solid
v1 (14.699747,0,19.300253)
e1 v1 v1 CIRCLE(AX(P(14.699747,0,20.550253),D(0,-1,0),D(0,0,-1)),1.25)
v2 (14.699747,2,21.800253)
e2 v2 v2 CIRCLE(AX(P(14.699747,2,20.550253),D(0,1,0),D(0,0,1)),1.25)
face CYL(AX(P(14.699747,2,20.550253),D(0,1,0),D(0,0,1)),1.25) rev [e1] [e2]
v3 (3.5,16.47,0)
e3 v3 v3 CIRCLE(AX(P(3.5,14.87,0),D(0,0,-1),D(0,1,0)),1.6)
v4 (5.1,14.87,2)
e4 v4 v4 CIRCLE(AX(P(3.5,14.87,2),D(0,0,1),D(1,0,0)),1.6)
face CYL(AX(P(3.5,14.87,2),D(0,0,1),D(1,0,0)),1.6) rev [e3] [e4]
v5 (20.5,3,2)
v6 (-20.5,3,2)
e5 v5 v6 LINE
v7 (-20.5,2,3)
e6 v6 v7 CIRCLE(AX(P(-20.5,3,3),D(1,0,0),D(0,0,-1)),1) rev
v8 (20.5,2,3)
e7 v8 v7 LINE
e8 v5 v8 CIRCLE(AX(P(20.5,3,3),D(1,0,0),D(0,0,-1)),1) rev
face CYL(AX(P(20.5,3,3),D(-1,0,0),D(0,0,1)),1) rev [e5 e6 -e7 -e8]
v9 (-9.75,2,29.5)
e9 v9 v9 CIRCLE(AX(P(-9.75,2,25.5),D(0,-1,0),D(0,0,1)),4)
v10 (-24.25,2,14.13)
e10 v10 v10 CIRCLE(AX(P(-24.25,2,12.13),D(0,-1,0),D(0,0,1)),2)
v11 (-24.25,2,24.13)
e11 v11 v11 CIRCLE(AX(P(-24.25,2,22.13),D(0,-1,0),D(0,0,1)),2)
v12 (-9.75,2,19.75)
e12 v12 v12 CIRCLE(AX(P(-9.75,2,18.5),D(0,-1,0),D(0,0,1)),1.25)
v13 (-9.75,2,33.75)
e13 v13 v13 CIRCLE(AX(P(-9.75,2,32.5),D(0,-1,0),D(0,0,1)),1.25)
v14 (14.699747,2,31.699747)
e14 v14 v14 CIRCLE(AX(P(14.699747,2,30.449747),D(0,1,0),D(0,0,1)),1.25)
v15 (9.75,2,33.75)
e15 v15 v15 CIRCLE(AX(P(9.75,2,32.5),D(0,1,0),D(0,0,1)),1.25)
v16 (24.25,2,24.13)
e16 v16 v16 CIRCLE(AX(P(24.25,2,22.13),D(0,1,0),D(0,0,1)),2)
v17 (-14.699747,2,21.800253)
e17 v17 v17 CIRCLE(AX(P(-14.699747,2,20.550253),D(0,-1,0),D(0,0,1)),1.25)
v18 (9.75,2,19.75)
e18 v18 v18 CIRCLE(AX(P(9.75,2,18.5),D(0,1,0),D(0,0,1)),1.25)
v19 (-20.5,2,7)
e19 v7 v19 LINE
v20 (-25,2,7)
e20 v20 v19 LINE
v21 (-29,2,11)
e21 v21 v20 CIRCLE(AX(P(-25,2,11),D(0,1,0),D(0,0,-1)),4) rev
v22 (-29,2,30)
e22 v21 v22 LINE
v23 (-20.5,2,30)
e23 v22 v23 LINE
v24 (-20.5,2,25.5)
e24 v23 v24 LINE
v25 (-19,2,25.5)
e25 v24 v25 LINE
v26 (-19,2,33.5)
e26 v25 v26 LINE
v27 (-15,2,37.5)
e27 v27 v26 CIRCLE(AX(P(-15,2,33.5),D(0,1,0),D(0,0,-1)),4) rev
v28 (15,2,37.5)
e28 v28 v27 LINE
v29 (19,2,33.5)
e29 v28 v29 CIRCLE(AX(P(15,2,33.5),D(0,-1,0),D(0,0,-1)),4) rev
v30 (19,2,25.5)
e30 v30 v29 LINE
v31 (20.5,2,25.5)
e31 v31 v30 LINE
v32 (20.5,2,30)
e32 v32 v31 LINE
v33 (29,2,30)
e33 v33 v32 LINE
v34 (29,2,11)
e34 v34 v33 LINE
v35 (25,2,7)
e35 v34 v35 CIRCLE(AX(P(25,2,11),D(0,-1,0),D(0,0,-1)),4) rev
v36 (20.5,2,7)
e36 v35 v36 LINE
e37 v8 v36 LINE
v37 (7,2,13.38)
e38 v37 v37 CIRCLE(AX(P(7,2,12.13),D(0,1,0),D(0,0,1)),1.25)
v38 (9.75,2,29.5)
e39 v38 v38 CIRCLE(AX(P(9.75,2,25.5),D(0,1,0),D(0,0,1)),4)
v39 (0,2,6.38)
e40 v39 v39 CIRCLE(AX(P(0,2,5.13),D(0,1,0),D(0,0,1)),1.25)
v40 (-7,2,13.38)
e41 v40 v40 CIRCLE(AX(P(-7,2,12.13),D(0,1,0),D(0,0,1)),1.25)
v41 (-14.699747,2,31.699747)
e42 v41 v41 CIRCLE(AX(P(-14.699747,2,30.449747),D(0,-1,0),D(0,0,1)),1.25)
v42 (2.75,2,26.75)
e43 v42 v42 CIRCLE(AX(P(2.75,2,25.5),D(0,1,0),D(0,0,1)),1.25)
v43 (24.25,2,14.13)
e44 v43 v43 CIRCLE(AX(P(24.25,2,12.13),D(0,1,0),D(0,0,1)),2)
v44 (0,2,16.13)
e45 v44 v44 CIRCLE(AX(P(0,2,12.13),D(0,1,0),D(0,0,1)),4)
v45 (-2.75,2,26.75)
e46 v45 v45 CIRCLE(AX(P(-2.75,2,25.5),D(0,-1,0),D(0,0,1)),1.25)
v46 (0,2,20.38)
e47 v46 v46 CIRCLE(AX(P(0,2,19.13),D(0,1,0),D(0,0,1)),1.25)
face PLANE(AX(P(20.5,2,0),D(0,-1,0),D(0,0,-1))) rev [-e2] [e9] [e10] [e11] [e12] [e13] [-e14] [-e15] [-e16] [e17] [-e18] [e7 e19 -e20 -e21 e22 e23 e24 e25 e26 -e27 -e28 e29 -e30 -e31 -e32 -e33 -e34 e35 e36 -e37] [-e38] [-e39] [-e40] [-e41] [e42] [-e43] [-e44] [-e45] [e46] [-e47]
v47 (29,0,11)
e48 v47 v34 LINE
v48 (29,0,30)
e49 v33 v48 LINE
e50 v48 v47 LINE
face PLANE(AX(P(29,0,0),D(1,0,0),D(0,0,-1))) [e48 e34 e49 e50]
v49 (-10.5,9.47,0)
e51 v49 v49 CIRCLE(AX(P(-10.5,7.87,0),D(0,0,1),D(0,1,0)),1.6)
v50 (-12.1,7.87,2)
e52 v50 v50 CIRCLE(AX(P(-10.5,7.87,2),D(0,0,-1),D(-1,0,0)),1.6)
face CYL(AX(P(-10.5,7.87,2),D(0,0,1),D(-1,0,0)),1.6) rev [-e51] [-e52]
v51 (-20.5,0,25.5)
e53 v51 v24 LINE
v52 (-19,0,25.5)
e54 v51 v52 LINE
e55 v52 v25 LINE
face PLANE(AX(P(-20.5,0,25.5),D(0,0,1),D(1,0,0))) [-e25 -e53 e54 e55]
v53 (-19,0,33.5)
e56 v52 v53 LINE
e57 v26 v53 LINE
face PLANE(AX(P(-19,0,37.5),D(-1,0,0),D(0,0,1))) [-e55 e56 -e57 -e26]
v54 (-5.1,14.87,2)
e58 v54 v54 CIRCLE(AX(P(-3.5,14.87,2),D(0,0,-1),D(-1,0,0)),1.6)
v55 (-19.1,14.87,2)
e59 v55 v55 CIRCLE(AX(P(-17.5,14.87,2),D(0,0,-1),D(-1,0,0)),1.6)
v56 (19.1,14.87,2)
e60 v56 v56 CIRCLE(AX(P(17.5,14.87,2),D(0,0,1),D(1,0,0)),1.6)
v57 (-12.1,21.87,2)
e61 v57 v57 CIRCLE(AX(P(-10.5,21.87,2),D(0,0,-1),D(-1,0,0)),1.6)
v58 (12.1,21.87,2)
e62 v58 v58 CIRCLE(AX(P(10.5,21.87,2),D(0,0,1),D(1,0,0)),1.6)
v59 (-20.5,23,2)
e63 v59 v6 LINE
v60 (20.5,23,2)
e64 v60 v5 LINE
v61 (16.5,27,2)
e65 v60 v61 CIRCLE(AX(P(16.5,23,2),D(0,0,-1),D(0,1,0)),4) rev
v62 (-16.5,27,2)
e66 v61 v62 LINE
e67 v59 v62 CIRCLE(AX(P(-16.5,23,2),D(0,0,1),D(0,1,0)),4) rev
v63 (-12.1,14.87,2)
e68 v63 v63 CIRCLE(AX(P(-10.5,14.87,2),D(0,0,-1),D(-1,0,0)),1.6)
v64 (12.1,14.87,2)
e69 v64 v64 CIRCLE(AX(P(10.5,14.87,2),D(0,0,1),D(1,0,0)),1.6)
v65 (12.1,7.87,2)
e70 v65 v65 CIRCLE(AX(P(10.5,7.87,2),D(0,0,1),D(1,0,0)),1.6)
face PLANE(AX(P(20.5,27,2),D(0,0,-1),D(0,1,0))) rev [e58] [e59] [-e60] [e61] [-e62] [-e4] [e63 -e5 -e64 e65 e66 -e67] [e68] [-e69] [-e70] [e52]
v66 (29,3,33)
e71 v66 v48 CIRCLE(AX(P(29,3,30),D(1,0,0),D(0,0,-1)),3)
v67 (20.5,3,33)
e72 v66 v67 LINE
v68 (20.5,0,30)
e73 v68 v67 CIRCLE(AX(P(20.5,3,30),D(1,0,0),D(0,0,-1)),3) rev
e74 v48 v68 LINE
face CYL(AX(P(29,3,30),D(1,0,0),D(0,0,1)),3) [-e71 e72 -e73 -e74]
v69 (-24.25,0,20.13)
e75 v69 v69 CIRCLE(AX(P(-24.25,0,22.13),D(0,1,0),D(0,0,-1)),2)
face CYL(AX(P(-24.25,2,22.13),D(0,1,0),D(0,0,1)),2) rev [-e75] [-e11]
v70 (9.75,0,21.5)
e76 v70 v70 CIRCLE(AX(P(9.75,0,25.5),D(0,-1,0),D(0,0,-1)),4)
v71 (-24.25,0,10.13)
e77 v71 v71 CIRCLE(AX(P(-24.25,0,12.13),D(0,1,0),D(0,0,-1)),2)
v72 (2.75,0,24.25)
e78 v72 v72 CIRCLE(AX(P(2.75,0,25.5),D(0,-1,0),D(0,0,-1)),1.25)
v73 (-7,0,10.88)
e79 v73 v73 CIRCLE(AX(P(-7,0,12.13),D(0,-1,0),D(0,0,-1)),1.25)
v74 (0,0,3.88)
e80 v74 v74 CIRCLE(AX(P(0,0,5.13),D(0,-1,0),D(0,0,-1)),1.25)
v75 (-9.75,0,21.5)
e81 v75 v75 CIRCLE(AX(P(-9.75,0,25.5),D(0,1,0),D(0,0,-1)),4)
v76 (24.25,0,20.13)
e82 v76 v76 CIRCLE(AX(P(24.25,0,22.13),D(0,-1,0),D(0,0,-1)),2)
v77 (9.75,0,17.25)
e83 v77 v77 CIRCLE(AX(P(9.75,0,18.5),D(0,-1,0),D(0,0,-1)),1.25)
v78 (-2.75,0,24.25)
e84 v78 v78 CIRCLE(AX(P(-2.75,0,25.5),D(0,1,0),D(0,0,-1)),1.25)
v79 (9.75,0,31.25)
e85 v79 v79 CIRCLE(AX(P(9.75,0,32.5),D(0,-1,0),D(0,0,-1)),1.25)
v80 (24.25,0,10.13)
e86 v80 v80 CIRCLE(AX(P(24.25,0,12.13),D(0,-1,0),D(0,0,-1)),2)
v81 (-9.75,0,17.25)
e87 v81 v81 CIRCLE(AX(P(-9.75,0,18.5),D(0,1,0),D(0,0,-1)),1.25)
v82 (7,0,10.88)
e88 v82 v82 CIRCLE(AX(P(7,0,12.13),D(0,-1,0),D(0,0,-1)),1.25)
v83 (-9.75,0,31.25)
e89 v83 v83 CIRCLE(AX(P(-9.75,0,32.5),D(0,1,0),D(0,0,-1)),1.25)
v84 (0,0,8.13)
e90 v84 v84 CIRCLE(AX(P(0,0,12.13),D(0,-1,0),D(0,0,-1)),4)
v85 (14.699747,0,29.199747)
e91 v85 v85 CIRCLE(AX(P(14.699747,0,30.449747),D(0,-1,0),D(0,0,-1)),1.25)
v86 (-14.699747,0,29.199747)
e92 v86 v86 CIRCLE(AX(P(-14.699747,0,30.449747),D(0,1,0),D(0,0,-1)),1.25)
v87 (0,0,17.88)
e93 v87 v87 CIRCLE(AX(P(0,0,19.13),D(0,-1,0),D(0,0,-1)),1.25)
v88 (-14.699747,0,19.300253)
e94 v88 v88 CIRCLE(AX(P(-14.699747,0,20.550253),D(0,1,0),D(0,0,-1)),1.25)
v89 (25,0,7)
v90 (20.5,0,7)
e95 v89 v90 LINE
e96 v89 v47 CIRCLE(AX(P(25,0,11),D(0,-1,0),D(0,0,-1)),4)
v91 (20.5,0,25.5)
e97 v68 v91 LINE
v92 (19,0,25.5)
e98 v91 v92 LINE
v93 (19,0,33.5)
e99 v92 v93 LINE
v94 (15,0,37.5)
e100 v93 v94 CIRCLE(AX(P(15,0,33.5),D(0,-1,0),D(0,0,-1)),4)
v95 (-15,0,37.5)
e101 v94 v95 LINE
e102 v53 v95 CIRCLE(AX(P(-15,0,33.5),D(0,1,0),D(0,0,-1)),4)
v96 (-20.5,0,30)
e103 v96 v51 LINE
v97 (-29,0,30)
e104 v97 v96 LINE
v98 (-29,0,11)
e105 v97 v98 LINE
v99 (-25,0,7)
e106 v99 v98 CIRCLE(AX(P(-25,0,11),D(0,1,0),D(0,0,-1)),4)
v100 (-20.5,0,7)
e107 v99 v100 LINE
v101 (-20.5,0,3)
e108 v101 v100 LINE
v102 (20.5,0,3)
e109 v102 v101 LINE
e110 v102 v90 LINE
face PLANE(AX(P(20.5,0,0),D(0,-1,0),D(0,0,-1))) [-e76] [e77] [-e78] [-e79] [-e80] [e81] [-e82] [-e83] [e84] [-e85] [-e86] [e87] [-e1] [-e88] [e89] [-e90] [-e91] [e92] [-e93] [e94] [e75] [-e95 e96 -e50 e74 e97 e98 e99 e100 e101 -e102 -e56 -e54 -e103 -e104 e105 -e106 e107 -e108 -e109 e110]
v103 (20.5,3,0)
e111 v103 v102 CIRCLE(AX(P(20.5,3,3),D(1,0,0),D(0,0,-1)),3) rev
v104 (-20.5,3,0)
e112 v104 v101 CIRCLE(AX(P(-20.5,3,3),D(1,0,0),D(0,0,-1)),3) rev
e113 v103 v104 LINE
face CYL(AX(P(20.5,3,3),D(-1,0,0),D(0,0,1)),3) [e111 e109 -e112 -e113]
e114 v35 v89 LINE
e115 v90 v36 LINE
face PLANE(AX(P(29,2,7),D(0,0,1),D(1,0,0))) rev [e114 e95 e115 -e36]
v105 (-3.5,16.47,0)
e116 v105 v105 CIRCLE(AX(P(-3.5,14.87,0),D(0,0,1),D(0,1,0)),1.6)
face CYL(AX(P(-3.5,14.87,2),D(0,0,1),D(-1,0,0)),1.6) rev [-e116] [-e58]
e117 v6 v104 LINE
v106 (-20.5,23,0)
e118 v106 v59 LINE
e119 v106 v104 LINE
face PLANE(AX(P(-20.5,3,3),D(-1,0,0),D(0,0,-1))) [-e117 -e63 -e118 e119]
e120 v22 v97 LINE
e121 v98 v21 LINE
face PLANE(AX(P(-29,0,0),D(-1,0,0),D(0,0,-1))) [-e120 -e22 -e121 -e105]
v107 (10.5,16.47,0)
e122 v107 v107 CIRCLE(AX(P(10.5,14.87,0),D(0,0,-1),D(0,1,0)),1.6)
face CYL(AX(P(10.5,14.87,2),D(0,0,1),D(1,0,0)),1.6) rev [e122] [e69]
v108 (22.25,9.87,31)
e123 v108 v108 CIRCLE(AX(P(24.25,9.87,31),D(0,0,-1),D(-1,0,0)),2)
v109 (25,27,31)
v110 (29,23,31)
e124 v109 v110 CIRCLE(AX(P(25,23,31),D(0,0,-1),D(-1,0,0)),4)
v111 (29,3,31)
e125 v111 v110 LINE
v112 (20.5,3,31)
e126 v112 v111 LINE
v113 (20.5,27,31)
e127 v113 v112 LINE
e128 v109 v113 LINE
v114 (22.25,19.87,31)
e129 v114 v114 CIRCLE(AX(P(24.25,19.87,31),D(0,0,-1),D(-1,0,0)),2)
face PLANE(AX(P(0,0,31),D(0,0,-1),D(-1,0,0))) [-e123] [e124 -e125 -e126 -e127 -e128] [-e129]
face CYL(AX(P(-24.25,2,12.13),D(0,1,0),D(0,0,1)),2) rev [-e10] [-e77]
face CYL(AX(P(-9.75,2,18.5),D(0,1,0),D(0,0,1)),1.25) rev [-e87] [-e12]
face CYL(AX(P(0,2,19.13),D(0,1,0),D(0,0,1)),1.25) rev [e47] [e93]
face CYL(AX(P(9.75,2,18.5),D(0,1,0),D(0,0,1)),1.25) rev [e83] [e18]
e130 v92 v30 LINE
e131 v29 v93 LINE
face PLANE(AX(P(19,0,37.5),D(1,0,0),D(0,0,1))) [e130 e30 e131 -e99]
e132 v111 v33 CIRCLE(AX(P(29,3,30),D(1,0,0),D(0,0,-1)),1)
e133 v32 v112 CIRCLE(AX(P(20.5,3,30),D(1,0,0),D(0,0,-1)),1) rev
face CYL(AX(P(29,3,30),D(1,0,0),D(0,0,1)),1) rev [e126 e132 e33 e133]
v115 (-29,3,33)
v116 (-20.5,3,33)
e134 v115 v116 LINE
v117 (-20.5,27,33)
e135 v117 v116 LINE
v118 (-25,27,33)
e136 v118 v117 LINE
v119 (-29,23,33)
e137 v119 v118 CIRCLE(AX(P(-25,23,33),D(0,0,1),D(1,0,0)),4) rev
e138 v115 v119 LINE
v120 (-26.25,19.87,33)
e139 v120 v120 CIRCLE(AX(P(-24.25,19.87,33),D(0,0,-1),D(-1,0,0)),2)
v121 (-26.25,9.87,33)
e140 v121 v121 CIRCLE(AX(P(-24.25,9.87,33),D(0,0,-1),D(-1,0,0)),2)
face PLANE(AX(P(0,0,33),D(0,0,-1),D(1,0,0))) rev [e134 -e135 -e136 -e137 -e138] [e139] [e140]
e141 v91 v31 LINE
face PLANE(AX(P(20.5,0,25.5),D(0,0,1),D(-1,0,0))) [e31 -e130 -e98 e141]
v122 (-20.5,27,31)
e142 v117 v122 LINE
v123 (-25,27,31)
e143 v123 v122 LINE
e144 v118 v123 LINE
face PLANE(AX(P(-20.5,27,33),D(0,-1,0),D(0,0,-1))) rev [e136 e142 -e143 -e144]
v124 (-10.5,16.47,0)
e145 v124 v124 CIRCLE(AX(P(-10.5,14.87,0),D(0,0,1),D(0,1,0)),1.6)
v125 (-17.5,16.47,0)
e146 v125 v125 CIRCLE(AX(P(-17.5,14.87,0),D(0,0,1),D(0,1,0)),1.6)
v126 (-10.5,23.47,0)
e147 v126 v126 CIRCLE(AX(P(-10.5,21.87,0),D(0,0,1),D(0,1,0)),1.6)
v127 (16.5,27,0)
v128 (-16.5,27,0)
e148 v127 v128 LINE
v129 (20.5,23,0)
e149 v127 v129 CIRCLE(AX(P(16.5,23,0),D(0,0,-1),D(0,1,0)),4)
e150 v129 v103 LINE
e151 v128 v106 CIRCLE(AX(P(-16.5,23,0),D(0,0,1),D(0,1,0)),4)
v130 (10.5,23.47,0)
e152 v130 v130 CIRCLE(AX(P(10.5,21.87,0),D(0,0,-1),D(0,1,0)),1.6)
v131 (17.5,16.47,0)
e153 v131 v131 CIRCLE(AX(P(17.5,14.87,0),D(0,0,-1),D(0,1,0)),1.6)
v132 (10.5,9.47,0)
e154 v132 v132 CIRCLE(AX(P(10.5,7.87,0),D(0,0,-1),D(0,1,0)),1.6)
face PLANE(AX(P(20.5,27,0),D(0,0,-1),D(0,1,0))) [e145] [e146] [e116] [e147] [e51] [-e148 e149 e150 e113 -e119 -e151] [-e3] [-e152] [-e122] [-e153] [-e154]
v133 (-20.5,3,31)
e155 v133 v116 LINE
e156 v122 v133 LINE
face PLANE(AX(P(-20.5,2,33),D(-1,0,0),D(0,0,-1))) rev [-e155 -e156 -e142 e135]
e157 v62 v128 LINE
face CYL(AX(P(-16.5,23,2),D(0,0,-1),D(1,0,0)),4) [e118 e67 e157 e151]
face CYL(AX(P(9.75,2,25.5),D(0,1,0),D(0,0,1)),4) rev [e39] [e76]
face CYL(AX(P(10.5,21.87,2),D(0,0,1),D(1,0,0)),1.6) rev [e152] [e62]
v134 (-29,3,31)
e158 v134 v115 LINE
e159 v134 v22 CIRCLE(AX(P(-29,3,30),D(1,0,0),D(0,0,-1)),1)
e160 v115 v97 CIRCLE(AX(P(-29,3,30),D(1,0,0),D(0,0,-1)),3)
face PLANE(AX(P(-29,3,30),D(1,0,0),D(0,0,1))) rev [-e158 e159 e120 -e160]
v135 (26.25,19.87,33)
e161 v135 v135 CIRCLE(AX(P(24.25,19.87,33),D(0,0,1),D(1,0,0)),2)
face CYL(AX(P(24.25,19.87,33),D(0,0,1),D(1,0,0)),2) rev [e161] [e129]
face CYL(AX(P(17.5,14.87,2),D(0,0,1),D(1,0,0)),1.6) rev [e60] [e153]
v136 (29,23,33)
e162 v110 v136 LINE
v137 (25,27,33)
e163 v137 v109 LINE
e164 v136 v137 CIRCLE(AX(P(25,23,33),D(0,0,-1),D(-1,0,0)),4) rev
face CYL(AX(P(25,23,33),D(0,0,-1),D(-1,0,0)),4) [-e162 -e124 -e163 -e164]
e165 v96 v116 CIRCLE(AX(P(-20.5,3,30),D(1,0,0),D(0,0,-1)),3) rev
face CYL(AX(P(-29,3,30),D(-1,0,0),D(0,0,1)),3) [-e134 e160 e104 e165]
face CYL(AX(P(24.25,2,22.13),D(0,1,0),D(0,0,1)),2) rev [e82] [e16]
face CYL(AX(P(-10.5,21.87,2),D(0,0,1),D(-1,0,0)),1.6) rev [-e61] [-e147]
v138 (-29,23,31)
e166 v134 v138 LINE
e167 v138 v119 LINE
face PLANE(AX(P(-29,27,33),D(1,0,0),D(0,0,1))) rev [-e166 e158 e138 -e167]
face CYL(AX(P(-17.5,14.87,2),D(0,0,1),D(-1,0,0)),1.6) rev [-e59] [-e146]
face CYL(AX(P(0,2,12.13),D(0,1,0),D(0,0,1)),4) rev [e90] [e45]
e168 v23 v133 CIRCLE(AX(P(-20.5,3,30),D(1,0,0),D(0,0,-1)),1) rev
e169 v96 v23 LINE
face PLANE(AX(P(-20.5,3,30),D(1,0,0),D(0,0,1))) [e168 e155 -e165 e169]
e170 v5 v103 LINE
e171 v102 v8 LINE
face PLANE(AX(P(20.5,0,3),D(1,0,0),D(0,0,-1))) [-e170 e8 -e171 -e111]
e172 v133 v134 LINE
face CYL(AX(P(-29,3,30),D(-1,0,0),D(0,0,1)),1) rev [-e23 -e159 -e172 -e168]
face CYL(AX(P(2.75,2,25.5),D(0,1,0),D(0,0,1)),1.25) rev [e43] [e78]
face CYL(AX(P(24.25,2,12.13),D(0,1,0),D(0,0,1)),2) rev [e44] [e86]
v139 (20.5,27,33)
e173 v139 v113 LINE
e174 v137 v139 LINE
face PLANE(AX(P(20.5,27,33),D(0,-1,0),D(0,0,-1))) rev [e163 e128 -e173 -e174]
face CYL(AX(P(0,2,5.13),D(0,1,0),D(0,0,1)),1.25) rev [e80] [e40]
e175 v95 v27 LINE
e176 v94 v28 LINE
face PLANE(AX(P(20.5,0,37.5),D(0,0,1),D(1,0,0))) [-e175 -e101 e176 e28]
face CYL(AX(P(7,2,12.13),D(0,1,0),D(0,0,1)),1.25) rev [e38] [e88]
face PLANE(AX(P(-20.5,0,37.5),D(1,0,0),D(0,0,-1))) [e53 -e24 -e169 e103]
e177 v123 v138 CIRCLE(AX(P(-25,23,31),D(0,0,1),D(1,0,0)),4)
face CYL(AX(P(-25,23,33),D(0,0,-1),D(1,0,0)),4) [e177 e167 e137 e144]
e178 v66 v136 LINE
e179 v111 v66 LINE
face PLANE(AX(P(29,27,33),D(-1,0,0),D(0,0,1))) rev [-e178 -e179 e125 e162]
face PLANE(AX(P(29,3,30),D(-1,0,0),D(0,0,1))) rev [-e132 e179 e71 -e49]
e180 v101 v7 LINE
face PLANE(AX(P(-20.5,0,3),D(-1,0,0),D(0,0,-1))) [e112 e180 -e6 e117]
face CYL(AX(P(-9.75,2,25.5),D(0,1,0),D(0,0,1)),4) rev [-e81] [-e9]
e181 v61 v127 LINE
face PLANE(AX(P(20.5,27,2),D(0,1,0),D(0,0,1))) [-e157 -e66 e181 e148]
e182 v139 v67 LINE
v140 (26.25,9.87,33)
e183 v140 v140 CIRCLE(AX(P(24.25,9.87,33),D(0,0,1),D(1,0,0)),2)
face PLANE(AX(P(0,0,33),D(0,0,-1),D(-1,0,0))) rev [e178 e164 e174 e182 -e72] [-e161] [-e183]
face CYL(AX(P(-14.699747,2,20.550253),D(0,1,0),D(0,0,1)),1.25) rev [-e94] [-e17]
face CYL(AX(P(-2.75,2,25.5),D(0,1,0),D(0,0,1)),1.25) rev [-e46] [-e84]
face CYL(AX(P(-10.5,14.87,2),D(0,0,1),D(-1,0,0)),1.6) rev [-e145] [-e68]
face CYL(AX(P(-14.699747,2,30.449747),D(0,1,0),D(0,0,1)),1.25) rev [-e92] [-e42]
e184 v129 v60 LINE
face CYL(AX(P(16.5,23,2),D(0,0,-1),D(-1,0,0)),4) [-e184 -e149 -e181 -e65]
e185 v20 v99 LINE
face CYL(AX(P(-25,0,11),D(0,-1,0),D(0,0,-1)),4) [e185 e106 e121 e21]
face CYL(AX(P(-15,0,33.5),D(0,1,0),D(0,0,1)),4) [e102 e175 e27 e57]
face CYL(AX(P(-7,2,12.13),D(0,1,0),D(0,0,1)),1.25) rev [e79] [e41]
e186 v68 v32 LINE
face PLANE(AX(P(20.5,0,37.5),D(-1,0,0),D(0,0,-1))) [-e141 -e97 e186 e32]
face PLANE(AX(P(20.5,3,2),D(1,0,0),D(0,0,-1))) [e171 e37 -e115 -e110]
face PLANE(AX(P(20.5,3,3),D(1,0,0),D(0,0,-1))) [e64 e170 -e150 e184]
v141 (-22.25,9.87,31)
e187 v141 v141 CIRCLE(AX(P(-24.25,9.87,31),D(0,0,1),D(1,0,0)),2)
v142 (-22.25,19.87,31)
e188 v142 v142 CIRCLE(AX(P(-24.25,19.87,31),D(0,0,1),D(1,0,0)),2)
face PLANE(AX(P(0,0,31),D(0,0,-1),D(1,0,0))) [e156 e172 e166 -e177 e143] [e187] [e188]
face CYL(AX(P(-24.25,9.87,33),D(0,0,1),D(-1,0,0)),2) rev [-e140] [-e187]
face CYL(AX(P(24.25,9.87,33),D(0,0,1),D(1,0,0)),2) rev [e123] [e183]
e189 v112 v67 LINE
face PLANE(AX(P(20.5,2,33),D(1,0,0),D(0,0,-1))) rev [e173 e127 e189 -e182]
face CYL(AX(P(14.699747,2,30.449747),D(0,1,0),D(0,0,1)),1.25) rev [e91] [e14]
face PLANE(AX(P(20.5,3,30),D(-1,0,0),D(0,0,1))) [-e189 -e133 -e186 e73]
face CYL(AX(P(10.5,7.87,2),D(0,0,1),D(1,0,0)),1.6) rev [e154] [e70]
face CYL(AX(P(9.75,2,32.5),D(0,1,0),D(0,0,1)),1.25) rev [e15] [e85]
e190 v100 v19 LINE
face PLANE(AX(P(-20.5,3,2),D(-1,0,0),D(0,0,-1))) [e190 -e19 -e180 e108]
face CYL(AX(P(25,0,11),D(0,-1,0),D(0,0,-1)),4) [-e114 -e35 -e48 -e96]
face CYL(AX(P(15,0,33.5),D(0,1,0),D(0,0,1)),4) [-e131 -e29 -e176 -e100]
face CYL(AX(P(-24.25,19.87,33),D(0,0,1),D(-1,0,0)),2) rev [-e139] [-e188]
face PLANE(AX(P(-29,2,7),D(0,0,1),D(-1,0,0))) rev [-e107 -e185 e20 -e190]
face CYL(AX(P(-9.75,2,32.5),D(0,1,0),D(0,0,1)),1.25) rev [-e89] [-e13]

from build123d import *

# Parameters (mm, degrees)
T_LE_DE_BASE_PLI_E1_DEPTH             = 20.5
ESQUISSE8_W                           = 24
ESQUISSE8_H                           = 2
BOSS_EXTRU_1_DEPTH                    = 8.5
T_LE_PLI_E_SUR_AR_TE1_STRIP_W         = 10
T_LE_PLI_E_SUR_AR_TE1_STRIP_H         = 2
T_LE_PLI_E_SUR_AR_TE1_STRIP_CUT_DEPTH = 8.5
T_LE_PLI_E_SUR_AR_TE1_DEPTH           = 8.5
ESQUISSE12_W                          = 1.5
ESQUISSE12_H                          = 12
ENL_V_MAT_EXTRU_1_DEPTH               = 8.5
DIAM_TRE_DU_PER_AGE_4_0_4_1_D         = 4
DIAM_TRE_DU_PER_AGE_8_0_8_1_D         = 8
DIAM_TRE_DU_PER_AGE_2_5_2_5_1_D       = 2.5
R_P_TITION_CIRCULAIRE1_COUNT          = 8
DIAM_TRE_DU_PER_AGE_4_0_4_2_D         = 4
HOLE_WIZARD_3_2_3_2_1_D               = 3.2
CONG_1_R                              = 4
DIAM_TRE_DU_PER_AGE_8_0_8_2_D         = 8
DIAM_TRE_DU_PER_AGE_2_5_2_5_3_D       = 2.5
R_P_TITION_CIRCULAIRE2_COUNT          = 4


# Sheet-metal steps are written as plain solids
with BuildPart() as part:
    # Esquisse1 → Tôle de base pliée1 (new body)
    with BuildSketch(Plane(origin=(0, 0, 0), x_dir=(0, 0, -1), z_dir=(1, 0, 0))):
        with BuildLine():
            Line((0, 27), (0, 3))
            ThreePointArc((0, 3), (-0.878679656, 0.878679656), (-3, 0))
            Line((-3, 0), (-37.5, 0))
            Line((-37.5, 0), (-37.5, 2))
            Line((-37.5, 2), (-3, 2))
            ThreePointArc((-3, 2), (-2.292893219, 2.292893219), (-2, 3))
            Line((-2, 3), (-2, 27))
            Line((-2, 27), (0, 27))
        make_face()
    extrude(amount=T_LE_DE_BASE_PLI_E1_DEPTH)

    # Esquisse8 → Boss.-Extru.1 (add)
    with BuildSketch(Plane(origin=(20.5, 0, 0), x_dir=(0, 0, -1), z_dir=(1, 0, 0))):
        with Locations((-19, 1)):
            Rectangle(ESQUISSE8_W, ESQUISSE8_H)
    extrude(amount=BOSS_EXTRU_1_DEPTH)

    # Tôle pliée sur arête1 strip (across the edge) → Tôle pliée sur arête1 strip cut (cut)
    with BuildSketch(Plane(origin=(20.5, 2, 31), x_dir=(0, 0, -1), z_dir=(1, 0, 0))):
        with Locations((-4, -1)):
            Rectangle(T_LE_PLI_E_SUR_AR_TE1_STRIP_W, T_LE_PLI_E_SUR_AR_TE1_STRIP_H)
    extrude(amount=T_LE_PLI_E_SUR_AR_TE1_STRIP_CUT_DEPTH, mode=Mode.SUBTRACT)

    # Tôle pliée sur arête1 section (across the edge) → Tôle pliée sur arête1 (add)
    with BuildSketch(Plane(origin=(20.5, 2, 31), x_dir=(0, 0, -1), z_dir=(1, 0, 0))):
        with BuildLine():
            Line((-2, 1), (-2, 25))
            Line((-2, 25), (0, 25))
            Line((0, 25), (0, 1))
            ThreePointArc((0, 1), (0.292893219, 0.292893219), (1, 0))
            Line((1, 0), (1, -2))
            ThreePointArc((1, -2), (-1.121320344, -1.121320344), (-2, 1))
        make_face()
    extrude(amount=T_LE_PLI_E_SUR_AR_TE1_DEPTH)

    # Esquisse12 → Enlèv. mat.-Extru.1 (cut)
    with BuildSketch(Plane(origin=(0, 2, 0), x_dir=(1, 0, 0), z_dir=(0, 1, 0))):
        with Locations((19.75, -31.5)):
            Rectangle(ESQUISSE12_W, ESQUISSE12_H)
    extrude(amount=-ENL_V_MAT_EXTRU_1_DEPTH, mode=Mode.SUBTRACT)

    # Diamètre du perçage Ø4.0 (4)1 (through all)
    with Locations(Plane(origin=(0, 2, 0), x_dir=(1, 0, 0), z_dir=(0, 1, 0))):
        with Locations((24.25, -12.13), (24.25, -22.13)):
            Hole(DIAM_TRE_DU_PER_AGE_4_0_4_1_D / 2)

    # Diamètre du perçage Ø8.0 (8)1 (through all)
    with Locations(Plane(origin=(0, 2, 0), x_dir=(1, 0, 0), z_dir=(0, 1, 0))):
        with Locations((9.75, -25.5)):
            Hole(DIAM_TRE_DU_PER_AGE_8_0_8_1_D / 2)

    # Diamètre du perçage Ø2.5 (2.5)1 (through all)
    with Locations(Plane(origin=(0, 2, 0), x_dir=(1, 0, 0), z_dir=(0, 1, 0))):
        with Locations((9.75, -18.5)):
            diam_tre_du_per_age_2_5_2_5_1 = Hole(DIAM_TRE_DU_PER_AGE_2_5_2_5_1_D / 2)

    # Répétition circulaire1: Diamètre du perçage Ø2.5 (2.5)1 ×8 about axis, 3 skipped
    r_p_tition_circulaire1_axis = Axis((9.75, 2, 25.5), (0, 1, 0))
    add([diam_tre_du_per_age_2_5_2_5_1.rotate(r_p_tition_circulaire1_axis, i * 360 / R_P_TITION_CIRCULAIRE1_COUNT) for i in range(1, R_P_TITION_CIRCULAIRE1_COUNT) if i not in (1, 3, 6)], mode=Mode.SUBTRACT)

    # Diamètre du perçage Ø4.0 (4)2 (through all)
    with Locations(Plane.XY.offset(33)):
        with Locations((24.25, 19.87), (24.25, 9.87)):
            Hole(DIAM_TRE_DU_PER_AGE_4_0_4_2_D / 2)

    # Ø3.2 (3.2) 直径孔1 (through all)
    with Locations(Plane.XY.offset(2)):
        with Locations((10.5, 14.87), (10.5, 21.87), (17.5, 14.87), (10.5, 7.87), (3.5, 14.87)):
            Hole(HOLE_WIZARD_3_2_3_2_1_D / 2)

    # Congé1
    cong_1_edges = [part.edges().sort_by_distance(p)[0] for p in [
        (20.5, 27, 1),
        (29, 1, 7),
        (29, 27, 32),
        (19, 1, 37.5),
    ]]
    fillet(cong_1_edges, radius=CONG_1_R)

    # Symétrie1: part across plane


with BuildPart() as part_1:
    add(part.part)
    add(part.part.mirror(Plane(origin=(0, 3, 3), x_dir=(0, 0, 1), z_dir=(1, 0, 0))))

    # Diamètre du perçage Ø8.0 (8)2 (through all)
    with Locations(Plane(origin=(0, 2, 0), x_dir=(1, 0, 0), z_dir=(0, 1, 0))):
        with Locations((0, -12.13)):
            Hole(DIAM_TRE_DU_PER_AGE_8_0_8_2_D / 2)

    # Diamètre du perçage Ø2.5 (2.5)3 (through all)
    with Locations(Plane(origin=(0, 2, 0), x_dir=(1, 0, 0), z_dir=(0, 1, 0))):
        with Locations((0, -5.13)):
            diam_tre_du_per_age_2_5_2_5_3 = Hole(DIAM_TRE_DU_PER_AGE_2_5_2_5_3_D / 2)

    # Répétition circulaire2: Diamètre du perçage Ø2.5 (2.5)3 ×4 about axis
    r_p_tition_circulaire2_axis = Axis((0, 0, 12.13), (0, 1, 0))
    for i in range(1, R_P_TITION_CIRCULAIRE2_COUNT):
        add(diam_tre_du_per_age_2_5_2_5_3.rotate(r_p_tition_circulaire2_axis, i * 360 / R_P_TITION_CIRCULAIRE2_COUNT), mode=Mode.SUBTRACT)


solid = part_1.part
